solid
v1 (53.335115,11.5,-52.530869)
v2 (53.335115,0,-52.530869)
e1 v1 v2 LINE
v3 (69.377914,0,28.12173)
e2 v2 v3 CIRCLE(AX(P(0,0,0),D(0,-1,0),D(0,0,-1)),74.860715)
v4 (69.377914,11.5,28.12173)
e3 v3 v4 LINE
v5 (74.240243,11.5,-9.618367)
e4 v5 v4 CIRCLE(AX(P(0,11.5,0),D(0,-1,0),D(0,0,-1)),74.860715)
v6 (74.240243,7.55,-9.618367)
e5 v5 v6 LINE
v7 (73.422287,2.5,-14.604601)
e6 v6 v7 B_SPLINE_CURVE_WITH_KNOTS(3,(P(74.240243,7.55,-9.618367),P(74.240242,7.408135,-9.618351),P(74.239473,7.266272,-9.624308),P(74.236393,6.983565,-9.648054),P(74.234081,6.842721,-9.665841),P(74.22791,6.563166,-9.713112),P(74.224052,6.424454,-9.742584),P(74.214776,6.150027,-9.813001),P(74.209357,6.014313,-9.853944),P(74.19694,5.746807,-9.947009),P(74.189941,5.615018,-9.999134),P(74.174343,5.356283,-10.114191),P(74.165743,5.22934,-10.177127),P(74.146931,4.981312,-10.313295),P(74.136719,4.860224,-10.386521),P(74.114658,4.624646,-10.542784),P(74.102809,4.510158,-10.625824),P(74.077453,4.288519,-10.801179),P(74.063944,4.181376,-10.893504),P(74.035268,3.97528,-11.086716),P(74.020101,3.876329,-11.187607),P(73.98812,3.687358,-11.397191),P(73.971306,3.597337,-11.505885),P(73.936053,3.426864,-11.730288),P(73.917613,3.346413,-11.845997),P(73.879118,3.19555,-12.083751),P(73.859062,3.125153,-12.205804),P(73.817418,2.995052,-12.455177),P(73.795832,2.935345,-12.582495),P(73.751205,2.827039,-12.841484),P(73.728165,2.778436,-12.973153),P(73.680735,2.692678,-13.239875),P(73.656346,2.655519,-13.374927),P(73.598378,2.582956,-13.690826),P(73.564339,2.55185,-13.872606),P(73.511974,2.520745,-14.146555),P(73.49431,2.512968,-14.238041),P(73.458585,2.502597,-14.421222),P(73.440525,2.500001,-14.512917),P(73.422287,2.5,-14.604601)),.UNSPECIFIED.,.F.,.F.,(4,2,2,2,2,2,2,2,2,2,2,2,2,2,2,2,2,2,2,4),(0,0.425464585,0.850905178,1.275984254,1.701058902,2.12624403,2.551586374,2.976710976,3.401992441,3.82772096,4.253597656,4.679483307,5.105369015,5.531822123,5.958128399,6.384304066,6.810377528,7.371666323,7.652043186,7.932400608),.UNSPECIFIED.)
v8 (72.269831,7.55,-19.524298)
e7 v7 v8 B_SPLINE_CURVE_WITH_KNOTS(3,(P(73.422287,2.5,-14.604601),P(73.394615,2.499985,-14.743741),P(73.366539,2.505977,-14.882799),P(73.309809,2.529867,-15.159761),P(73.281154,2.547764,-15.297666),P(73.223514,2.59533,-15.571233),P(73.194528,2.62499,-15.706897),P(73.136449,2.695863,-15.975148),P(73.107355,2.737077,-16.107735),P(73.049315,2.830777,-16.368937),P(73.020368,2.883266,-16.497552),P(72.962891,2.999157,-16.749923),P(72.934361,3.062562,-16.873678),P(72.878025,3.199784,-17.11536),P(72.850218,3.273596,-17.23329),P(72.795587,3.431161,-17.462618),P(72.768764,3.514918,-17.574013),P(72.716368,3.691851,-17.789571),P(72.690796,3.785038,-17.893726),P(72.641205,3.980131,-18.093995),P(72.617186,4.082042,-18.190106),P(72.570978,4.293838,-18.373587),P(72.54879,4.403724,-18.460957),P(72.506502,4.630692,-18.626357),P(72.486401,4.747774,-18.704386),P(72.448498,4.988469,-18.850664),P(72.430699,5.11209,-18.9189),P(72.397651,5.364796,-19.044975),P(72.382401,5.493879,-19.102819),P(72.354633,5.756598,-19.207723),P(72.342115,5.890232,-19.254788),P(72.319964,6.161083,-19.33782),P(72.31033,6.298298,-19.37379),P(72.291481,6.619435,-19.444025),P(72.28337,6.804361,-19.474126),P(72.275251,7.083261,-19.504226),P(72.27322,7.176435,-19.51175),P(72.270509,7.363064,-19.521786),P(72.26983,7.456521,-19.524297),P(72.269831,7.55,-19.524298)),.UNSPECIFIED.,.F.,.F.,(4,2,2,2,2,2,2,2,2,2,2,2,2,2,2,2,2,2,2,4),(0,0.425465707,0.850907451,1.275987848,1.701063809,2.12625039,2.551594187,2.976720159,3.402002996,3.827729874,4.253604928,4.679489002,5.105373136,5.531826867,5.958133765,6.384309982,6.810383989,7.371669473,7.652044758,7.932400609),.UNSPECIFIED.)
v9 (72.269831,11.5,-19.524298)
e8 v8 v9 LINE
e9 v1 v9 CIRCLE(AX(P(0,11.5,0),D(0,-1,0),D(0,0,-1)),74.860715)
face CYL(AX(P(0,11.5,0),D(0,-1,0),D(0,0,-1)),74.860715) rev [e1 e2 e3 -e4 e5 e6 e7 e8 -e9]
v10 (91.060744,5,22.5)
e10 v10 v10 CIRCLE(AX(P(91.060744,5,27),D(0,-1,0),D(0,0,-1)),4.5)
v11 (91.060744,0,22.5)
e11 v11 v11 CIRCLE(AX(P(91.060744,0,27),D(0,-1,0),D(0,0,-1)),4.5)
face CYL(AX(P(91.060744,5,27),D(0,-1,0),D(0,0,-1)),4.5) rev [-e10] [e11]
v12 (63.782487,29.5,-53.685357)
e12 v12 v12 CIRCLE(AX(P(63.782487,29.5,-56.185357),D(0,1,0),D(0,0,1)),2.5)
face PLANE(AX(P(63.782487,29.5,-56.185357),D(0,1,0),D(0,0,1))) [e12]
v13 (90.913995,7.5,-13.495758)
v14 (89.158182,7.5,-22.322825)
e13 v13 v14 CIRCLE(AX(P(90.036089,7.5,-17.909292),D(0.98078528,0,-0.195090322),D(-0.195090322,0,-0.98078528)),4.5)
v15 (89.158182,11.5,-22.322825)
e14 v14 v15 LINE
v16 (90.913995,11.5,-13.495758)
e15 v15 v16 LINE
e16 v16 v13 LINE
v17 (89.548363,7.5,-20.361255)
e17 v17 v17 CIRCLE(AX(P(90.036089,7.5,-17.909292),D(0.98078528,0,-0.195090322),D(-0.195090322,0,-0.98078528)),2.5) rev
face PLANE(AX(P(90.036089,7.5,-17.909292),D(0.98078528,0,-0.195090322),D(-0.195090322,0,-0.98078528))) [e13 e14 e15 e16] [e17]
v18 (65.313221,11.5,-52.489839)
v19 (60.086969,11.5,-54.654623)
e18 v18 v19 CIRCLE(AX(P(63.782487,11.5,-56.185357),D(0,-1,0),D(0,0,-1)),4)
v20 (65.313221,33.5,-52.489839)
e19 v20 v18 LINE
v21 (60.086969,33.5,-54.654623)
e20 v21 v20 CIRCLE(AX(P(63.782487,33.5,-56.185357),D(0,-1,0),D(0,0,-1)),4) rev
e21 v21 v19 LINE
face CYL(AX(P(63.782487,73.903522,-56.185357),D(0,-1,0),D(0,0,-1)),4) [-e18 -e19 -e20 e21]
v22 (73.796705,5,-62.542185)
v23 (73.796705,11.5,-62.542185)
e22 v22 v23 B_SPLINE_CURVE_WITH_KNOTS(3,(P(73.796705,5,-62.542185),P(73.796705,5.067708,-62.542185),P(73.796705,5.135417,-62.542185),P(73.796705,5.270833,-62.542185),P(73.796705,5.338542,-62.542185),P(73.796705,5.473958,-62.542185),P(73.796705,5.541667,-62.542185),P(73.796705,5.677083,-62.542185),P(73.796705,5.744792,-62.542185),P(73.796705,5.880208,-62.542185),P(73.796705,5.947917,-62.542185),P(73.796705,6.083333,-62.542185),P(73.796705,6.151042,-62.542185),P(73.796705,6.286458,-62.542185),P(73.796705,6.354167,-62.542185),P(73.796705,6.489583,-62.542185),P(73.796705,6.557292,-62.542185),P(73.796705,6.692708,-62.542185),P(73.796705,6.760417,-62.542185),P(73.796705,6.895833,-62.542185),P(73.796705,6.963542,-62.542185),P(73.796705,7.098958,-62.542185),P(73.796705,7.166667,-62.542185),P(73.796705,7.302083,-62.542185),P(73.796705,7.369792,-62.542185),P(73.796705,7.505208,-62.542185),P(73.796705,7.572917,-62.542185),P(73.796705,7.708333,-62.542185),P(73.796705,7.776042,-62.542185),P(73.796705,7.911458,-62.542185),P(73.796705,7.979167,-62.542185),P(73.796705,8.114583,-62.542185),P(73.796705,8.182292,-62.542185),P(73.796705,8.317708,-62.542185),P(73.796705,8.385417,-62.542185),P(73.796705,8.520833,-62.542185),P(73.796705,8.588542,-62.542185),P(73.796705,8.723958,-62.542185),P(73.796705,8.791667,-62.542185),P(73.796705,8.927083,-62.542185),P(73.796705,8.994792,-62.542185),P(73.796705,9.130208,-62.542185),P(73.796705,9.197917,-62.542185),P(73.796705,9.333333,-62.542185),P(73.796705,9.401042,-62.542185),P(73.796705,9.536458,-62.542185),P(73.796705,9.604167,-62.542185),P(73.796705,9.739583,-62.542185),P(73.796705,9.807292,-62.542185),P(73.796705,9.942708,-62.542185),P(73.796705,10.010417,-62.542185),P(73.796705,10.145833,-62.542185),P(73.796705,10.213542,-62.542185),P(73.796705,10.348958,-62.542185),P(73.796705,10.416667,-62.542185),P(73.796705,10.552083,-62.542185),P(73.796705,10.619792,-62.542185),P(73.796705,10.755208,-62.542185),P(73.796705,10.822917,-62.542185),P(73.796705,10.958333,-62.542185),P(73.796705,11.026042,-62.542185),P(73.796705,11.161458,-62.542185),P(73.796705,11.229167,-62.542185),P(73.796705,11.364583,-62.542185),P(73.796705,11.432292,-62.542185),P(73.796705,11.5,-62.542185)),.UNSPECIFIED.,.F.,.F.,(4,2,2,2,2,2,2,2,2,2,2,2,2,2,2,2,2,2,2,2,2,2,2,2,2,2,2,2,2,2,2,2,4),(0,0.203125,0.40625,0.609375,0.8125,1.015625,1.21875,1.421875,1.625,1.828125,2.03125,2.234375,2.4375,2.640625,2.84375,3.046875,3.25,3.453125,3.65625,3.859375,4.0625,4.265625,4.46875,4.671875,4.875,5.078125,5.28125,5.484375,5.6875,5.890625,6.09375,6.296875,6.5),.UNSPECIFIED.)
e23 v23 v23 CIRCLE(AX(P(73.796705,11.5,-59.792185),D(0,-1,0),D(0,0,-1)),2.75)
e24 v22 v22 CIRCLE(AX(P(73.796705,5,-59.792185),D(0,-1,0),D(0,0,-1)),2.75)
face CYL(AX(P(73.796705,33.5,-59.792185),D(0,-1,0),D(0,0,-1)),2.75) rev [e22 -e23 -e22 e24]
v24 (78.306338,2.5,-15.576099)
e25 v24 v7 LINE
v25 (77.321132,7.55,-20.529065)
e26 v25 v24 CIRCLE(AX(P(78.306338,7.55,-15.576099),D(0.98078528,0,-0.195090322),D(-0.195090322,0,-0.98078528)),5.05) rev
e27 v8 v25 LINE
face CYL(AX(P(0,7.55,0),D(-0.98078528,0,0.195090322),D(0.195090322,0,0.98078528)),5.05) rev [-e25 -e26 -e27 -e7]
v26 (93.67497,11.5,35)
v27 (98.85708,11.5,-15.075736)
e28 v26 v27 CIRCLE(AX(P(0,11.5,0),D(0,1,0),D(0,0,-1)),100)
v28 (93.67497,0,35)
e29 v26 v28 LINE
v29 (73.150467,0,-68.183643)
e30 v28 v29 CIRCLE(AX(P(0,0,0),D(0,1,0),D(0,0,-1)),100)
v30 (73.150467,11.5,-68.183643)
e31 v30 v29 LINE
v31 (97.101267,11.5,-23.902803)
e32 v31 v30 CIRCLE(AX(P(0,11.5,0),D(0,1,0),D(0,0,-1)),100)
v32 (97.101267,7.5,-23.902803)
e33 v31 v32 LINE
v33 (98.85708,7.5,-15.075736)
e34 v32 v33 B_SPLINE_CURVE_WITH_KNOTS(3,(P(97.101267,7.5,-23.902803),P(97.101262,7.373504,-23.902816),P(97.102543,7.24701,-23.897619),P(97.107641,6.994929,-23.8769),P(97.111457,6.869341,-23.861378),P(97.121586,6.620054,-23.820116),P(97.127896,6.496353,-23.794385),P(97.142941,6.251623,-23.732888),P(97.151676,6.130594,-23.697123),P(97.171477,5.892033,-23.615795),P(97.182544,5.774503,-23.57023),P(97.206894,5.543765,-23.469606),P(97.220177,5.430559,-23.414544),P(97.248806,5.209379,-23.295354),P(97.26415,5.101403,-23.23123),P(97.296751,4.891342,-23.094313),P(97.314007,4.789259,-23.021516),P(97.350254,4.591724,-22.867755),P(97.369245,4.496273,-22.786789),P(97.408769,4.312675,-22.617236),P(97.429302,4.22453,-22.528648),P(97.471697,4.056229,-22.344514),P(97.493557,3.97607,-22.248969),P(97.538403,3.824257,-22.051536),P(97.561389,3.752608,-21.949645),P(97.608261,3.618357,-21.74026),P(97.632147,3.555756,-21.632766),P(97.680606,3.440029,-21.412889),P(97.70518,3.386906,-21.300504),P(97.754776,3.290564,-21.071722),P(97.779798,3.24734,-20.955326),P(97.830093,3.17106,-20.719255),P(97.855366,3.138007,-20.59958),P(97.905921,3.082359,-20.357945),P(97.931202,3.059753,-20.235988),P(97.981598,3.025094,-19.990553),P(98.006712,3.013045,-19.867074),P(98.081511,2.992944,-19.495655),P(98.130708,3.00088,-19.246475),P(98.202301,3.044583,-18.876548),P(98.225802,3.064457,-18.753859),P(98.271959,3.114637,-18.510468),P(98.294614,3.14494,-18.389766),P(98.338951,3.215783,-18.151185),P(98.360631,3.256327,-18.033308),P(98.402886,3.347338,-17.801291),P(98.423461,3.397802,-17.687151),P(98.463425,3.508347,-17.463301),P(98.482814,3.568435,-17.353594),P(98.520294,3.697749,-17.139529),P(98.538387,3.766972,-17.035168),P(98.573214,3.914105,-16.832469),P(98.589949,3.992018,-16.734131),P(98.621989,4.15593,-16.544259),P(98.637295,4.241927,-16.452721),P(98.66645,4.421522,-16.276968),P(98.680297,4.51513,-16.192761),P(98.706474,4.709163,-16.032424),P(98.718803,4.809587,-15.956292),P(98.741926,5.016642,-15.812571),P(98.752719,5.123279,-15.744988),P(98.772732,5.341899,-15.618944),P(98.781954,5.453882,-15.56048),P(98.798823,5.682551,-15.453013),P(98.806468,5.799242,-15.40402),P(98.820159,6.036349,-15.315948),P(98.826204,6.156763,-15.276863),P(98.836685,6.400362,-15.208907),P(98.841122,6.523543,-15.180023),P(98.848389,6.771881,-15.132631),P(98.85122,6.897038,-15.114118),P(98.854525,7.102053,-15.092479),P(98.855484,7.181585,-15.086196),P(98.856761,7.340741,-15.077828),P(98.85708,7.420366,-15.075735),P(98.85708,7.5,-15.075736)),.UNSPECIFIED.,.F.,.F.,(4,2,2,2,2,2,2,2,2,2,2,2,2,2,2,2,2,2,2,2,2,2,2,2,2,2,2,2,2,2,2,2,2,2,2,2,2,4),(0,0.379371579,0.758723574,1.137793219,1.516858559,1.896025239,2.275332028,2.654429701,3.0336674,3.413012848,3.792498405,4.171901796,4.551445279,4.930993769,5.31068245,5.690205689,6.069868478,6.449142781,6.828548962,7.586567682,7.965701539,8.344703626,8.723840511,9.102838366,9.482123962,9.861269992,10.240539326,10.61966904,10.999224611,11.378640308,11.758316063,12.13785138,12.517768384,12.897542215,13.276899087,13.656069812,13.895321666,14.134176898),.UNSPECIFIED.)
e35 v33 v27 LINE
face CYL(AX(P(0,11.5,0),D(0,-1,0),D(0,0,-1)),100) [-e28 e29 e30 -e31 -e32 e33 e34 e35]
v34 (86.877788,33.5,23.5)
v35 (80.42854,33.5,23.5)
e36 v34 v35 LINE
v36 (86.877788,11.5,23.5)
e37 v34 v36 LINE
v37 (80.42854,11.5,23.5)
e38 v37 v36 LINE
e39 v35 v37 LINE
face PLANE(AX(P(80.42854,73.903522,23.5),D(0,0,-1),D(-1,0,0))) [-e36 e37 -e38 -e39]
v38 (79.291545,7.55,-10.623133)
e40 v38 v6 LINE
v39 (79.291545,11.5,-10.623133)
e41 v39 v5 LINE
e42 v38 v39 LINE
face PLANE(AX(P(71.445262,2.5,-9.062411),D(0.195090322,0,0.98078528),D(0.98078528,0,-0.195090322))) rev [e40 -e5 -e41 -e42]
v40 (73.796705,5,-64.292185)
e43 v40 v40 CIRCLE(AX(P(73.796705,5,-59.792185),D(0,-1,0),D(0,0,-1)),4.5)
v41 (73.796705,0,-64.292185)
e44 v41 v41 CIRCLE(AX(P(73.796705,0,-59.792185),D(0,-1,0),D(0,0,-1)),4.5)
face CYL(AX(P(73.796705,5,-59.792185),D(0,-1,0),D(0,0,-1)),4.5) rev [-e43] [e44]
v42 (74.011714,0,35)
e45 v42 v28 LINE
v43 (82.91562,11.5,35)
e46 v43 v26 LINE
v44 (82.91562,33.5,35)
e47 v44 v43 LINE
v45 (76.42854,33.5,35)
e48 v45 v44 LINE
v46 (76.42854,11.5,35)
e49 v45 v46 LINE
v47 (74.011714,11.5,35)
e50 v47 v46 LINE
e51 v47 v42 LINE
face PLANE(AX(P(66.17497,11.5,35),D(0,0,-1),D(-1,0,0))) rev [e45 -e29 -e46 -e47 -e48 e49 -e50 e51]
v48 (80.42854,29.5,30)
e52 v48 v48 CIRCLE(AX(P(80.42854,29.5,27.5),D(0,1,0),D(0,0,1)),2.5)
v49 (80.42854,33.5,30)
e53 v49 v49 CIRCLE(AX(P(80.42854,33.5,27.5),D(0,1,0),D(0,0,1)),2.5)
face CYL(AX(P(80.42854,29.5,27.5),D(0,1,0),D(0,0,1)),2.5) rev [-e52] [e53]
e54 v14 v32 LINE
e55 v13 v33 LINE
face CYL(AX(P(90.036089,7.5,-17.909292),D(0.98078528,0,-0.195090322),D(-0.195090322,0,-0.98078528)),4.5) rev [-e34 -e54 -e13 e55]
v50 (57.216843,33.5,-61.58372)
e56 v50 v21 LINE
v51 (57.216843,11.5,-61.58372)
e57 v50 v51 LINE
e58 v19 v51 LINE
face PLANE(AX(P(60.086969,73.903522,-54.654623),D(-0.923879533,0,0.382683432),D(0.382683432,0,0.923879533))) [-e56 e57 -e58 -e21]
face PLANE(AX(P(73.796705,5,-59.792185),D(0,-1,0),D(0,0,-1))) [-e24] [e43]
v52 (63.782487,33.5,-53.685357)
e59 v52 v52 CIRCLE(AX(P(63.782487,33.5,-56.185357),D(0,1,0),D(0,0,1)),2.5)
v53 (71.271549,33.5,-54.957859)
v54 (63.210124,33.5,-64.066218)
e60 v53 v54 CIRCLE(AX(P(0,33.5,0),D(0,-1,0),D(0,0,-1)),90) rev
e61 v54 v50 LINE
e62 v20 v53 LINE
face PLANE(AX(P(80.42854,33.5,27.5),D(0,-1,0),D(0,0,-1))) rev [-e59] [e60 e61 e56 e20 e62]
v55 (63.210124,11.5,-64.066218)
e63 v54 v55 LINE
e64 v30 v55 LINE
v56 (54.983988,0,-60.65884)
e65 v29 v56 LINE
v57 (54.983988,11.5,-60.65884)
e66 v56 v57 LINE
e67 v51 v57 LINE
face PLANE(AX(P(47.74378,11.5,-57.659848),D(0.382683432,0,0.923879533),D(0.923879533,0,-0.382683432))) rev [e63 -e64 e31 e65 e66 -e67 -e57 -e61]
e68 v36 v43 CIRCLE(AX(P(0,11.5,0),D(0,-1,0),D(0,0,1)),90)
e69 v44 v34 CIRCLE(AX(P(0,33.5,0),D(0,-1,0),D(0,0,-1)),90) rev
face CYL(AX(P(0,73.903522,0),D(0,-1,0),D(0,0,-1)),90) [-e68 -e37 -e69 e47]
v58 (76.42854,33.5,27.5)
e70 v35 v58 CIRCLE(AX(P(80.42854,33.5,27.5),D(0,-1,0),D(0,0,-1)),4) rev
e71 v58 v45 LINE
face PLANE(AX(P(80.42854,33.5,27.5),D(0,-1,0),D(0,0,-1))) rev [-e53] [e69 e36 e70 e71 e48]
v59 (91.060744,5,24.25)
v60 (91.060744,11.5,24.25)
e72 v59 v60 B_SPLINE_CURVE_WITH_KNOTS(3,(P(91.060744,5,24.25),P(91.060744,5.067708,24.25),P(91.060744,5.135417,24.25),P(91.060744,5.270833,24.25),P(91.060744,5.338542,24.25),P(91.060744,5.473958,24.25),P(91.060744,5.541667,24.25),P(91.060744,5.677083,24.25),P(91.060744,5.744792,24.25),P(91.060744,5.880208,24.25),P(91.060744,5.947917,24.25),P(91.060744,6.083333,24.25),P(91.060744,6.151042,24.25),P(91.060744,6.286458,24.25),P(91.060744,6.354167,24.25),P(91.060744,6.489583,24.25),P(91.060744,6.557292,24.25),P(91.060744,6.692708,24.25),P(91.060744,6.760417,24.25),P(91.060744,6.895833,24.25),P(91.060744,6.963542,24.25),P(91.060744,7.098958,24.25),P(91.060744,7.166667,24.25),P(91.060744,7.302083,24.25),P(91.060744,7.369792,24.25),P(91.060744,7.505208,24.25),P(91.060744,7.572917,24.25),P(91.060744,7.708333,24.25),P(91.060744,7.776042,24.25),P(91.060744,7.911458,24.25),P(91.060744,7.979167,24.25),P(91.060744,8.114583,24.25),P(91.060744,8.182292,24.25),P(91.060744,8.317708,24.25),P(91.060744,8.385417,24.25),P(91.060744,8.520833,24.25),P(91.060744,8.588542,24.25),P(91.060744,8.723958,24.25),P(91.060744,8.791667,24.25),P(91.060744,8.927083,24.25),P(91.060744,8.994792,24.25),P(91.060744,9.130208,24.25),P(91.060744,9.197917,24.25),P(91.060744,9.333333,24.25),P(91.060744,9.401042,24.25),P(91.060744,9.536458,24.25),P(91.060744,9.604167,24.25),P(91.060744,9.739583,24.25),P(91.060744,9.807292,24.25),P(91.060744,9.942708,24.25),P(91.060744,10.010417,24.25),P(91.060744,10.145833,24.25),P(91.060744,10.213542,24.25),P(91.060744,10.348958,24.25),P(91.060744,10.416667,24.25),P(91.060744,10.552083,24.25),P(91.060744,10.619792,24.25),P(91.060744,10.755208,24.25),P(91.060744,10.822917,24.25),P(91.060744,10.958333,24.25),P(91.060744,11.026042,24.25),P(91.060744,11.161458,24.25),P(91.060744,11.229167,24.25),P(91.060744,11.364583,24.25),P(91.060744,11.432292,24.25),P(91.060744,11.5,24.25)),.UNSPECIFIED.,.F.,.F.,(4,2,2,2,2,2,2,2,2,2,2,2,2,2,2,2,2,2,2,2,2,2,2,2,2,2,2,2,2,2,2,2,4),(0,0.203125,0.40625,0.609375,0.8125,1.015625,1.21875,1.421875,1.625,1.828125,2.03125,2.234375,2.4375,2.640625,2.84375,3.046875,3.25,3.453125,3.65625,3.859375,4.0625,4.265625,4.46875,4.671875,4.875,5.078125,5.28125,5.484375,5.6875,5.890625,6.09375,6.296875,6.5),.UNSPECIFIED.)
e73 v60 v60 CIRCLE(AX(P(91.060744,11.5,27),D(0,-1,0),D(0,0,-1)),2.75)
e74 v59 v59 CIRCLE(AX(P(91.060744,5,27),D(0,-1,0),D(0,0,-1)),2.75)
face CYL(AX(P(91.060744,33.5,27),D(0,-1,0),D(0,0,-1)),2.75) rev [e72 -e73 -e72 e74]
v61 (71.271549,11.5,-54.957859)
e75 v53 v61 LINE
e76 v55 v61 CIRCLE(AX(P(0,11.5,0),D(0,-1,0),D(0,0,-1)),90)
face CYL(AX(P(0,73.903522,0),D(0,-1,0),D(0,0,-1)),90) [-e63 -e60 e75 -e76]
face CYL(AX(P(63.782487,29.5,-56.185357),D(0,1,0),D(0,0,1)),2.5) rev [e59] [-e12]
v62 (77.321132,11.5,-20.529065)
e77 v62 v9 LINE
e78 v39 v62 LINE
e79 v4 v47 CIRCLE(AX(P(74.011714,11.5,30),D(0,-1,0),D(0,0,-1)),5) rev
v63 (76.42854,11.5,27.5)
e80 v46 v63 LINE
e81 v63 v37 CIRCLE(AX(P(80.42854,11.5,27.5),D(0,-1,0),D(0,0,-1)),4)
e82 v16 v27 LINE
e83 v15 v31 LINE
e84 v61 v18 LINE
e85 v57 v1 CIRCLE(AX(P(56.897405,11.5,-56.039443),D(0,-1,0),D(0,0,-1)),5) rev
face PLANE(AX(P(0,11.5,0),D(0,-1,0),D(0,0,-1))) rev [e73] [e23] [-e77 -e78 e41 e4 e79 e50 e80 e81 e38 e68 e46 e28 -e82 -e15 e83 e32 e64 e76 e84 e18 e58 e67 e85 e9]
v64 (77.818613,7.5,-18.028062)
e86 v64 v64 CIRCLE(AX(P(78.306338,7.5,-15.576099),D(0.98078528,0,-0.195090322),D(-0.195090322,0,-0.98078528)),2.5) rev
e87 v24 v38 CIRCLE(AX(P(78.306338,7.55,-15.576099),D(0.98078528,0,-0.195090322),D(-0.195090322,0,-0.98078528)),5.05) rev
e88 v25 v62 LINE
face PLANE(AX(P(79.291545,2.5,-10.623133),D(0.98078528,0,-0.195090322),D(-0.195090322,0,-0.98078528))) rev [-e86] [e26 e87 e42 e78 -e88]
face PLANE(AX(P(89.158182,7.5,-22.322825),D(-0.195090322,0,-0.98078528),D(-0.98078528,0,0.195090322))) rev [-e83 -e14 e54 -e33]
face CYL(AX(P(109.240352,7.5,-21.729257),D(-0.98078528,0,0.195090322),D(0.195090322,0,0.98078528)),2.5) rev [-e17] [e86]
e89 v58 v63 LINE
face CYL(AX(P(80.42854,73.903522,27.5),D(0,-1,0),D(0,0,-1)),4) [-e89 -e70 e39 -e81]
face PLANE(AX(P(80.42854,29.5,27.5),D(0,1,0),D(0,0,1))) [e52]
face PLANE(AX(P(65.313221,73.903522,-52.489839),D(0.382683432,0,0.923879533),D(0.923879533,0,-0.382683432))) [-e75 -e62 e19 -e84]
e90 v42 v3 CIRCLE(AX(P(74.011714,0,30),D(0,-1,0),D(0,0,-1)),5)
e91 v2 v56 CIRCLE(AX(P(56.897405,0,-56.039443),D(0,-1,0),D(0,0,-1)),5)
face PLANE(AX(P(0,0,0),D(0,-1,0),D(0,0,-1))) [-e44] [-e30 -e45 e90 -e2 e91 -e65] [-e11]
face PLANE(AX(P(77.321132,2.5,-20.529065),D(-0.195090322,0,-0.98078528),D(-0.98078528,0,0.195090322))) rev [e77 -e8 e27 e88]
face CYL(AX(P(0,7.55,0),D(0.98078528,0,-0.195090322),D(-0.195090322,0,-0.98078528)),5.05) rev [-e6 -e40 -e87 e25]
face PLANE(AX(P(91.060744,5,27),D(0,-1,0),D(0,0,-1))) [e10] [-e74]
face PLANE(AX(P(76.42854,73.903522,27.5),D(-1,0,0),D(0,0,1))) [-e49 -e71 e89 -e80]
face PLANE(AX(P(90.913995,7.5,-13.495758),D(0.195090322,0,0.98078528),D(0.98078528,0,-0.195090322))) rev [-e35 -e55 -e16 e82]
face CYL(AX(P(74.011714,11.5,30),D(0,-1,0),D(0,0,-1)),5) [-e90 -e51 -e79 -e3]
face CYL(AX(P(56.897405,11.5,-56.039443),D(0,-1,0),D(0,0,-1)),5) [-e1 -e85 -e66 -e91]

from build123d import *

# Parameters (mm, degrees)
BOSS_EXTRUDE1_DEPTH = 11.5
BOSS_EXTRUDE2_DEPTH = 22
SKETCH3_R           = 2.5
CUT_EXTRUDE1_DEPTH  = 4
SKETCH4_R           = 4.5
CUT_EXTRUDE2_DEPTH  = 5
SKETCH5_R           = 2.75
CUT_EXTRUDE3_DEPTH  = 125.343311555
SKETCH6_R           = 2.5
CUT_EXTRUDE4_DEPTH  = 79.78509189
CUT_EXTRUDE5_DEPTH  = 8.2
CUT_EXTRUDE6_DEPTH  = 9
FILLET1_R           = 5.05
FILLET2_R           = 5


with BuildPart() as part:
    # Sketch1 → Boss-Extrude1 (new body)
    with BuildSketch(Plane(origin=(0, 0, 0), x_dir=(1, 0, 0), z_dir=(0, 1, 0))):
        with BuildLine():
            Line((66.174969976, -35), (93.674969976, -35))
            ThreePointArc((93.674969976, -35), (98.07852804, 19.509032202), (73.150467337, 68.183642675))
            Line((73.150467337, 68.183642675), (47.743780193, 57.659848285))
            ThreePointArc((47.743780193, 57.659848285), (73.422287359, 14.604600997), (66.174969976, -35))
        make_face()
    extrude(amount=BOSS_EXTRUDE1_DEPTH)

    # Sketch2 → Boss-Extrude2 (add)
    with BuildSketch(Plane.XZ.offset(-11.5)):
        with BuildLine():
            Line((80.428539711, 23.5), (86.877787725, 23.5))
            ThreePointArc((86.877787725, 23.5), (85.091202872, 29.317012019), (82.915619759, 35))
            Line((82.915619759, 35), (76.428539711, 35))
            Line((76.428539711, 35), (76.428539711, 27.5))
            ThreePointArc((76.428539711, 27.5), (77.600112586, 24.671572875), (80.428539711, 23.5))
        make_face()
        with BuildLine():
            Line((60.086969148, -54.654623051), (57.216843406, -61.583719545))
            Line((57.216843406, -61.583719545), (63.210123888, -64.066217604))
            ThreePointArc((63.210123888, -64.066217604), (67.394885944, -59.648380938), (71.271549248, -54.957859017))
            Line((71.271549248, -54.957859017), (65.313221008, -52.489838651))
            ThreePointArc((65.313221008, -52.489838651), (62.251753549, -52.489838651), (60.086969148, -54.654623051))
        make_face()
    extrude(amount=-BOSS_EXTRUDE2_DEPTH)

    # Sketch3 → Cut-Extrude1 (cut)
    with BuildSketch(Plane(origin=(0, 33.5, 0), x_dir=(1, 0, 0), z_dir=(0, 1, 0))):
        with Locations(Location((63.782487278, 56.185356781, 0), (0, 0, 270))):
            Circle(SKETCH3_R)
        with Locations(Location((80.428539711, -27.5, 0), (0, 0, 270))):
            Circle(SKETCH3_R)
    extrude(amount=-CUT_EXTRUDE1_DEPTH, mode=Mode.SUBTRACT)

    # Sketch4 → Cut-Extrude2 (cut)
    with BuildSketch(Plane.XZ):
        with Locations(Location((91.060743988, 27, 0), (0, 0, 270))):
            Circle(SKETCH4_R)
        with Locations(Location((73.796704912, -59.792185441, 0), (0, 0, 270))):
            Circle(SKETCH4_R)
    extrude(amount=-CUT_EXTRUDE2_DEPTH, mode=Mode.SUBTRACT)

    # Sketch5 → Cut-Extrude3 (cut, through all)
    with BuildSketch(Plane.XZ.offset(-5)):
        with Locations(Location((91.060743988, 27, 0), (0, 0, 270))):
            Circle(SKETCH5_R)
        with Locations(Location((73.796704912, -59.792185441, 0), (0, 0, 270))):
            Circle(SKETCH5_R)
    extrude(amount=-CUT_EXTRUDE3_DEPTH, mode=Mode.SUBTRACT)

    # Sketch6 → Cut-Extrude4 (cut, through all)
    with BuildSketch(Plane(origin=(56.959375084, 0, -11.329924142), x_dir=(0.19509032201612866, 0, 0.9807852804032304), z_dir=(-0.9807852804032304, 0, 0.19509032201612866))):
        with Locations((0, 7.5)):
            Circle(SKETCH6_R)
    extrude(amount=-CUT_EXTRUDE4_DEPTH, mode=Mode.SUBTRACT)

    # Sketch8 → Cut-Extrude5 (cut)
    with BuildSketch(Plane(origin=(98.07852804, 0, -19.509032202), x_dir=(-0.19509032201612866, 0, -0.9807852804032304), z_dir=(0.9807852804032304, 0, -0.19509032201612866))):
        with BuildLine():
            Line((-4.5, 7.5), (-4.5, 11.5))
            Line((-4.5, 11.5), (4.5, 11.5))
            Line((4.5, 11.5), (4.5, 7.5))
            ThreePointArc((4.5, 7.5), (0, 3), (-4.5, 7.5))
        make_face()
    extrude(amount=-CUT_EXTRUDE5_DEPTH, mode=Mode.SUBTRACT)

    # Sketch7 → Cut-Extrude6 (cut)
    with BuildSketch(Plane(origin=(0, 11.5, 0), x_dir=(1, 0, 0), z_dir=(0, 1, 0))):
        Polygon((69.47485004, 18.968342244), (71.445262293, 9.062410912), (79.291544536, 10.623133488), (77.321132284, 20.52906482), align=None)
    extrude(amount=-CUT_EXTRUDE6_DEPTH, mode=Mode.SUBTRACT)

    # Fillet1
    # the kernel refuses this fillet: 5.05 mm, written as the material it adds along each edge
    with BuildSketch(Plane(origin=(61.857828731, 2.5, -7.155351805), x_dir=(0, 1, 0), z_dir=(0.9807852804032302, 0, -0.1950903220161298))) as fillet1_piece_1_section:
        with BuildLine():
            CenterArc((FILLET1_R, -FILLET1_R), FILLET1_R, 90, 90)
            Line((0, -FILLET1_R), (0, 0))
            Line((0, 0), (FILLET1_R, 0))
        make_face()
    fillet1_piece_1 = extrude(amount=30.40026249, mode=Mode.PRIVATE)
    fillet1_piece_1 = fillet1_piece_1 - Plane(origin=(0, 3.649852304, 0), x_dir=(0.6377681563457176, 0, -0.7702283938880625), z_dir=(0, -1, 0)) * Cylinder(74.860715007, 82, mode=Mode.PRIVATE)
    add(fillet1_piece_1)
    with BuildSketch(Plane(origin=(89.703546449, 2.5, -22.992080135), x_dir=(0, 1, 0), z_dir=(-0.9807852804032304, 0, 0.19509032201612841))) as fillet1_piece_2_section:
        with BuildLine():
            CenterArc((FILLET1_R, -FILLET1_R), FILLET1_R, 90, 90)
            Line((0, -FILLET1_R), (0, 0))
            Line((0, 0), (FILLET1_R, 0))
        make_face()
    fillet1_piece_2 = extrude(amount=30.40026249, mode=Mode.PRIVATE)
    fillet1_piece_2 = fillet1_piece_2 - Plane(origin=(0, 3.643295327, 0), x_dir=(0.6377681563457176, 0, -0.7702283938880625), z_dir=(0, -1, 0)) * Cylinder(74.860715007, 82, mode=Mode.PRIVATE)
    add(fillet1_piece_2)

    # Fillet2
    fillet2_edges = [part.edges().sort_by_distance(p)[0] for p in [
        (66.174969976, 5.75, 35),
        (47.743780193, 5.75, -57.659848285),
    ]]
    fillet(fillet2_edges, radius=FILLET2_R)


solid = part.part
